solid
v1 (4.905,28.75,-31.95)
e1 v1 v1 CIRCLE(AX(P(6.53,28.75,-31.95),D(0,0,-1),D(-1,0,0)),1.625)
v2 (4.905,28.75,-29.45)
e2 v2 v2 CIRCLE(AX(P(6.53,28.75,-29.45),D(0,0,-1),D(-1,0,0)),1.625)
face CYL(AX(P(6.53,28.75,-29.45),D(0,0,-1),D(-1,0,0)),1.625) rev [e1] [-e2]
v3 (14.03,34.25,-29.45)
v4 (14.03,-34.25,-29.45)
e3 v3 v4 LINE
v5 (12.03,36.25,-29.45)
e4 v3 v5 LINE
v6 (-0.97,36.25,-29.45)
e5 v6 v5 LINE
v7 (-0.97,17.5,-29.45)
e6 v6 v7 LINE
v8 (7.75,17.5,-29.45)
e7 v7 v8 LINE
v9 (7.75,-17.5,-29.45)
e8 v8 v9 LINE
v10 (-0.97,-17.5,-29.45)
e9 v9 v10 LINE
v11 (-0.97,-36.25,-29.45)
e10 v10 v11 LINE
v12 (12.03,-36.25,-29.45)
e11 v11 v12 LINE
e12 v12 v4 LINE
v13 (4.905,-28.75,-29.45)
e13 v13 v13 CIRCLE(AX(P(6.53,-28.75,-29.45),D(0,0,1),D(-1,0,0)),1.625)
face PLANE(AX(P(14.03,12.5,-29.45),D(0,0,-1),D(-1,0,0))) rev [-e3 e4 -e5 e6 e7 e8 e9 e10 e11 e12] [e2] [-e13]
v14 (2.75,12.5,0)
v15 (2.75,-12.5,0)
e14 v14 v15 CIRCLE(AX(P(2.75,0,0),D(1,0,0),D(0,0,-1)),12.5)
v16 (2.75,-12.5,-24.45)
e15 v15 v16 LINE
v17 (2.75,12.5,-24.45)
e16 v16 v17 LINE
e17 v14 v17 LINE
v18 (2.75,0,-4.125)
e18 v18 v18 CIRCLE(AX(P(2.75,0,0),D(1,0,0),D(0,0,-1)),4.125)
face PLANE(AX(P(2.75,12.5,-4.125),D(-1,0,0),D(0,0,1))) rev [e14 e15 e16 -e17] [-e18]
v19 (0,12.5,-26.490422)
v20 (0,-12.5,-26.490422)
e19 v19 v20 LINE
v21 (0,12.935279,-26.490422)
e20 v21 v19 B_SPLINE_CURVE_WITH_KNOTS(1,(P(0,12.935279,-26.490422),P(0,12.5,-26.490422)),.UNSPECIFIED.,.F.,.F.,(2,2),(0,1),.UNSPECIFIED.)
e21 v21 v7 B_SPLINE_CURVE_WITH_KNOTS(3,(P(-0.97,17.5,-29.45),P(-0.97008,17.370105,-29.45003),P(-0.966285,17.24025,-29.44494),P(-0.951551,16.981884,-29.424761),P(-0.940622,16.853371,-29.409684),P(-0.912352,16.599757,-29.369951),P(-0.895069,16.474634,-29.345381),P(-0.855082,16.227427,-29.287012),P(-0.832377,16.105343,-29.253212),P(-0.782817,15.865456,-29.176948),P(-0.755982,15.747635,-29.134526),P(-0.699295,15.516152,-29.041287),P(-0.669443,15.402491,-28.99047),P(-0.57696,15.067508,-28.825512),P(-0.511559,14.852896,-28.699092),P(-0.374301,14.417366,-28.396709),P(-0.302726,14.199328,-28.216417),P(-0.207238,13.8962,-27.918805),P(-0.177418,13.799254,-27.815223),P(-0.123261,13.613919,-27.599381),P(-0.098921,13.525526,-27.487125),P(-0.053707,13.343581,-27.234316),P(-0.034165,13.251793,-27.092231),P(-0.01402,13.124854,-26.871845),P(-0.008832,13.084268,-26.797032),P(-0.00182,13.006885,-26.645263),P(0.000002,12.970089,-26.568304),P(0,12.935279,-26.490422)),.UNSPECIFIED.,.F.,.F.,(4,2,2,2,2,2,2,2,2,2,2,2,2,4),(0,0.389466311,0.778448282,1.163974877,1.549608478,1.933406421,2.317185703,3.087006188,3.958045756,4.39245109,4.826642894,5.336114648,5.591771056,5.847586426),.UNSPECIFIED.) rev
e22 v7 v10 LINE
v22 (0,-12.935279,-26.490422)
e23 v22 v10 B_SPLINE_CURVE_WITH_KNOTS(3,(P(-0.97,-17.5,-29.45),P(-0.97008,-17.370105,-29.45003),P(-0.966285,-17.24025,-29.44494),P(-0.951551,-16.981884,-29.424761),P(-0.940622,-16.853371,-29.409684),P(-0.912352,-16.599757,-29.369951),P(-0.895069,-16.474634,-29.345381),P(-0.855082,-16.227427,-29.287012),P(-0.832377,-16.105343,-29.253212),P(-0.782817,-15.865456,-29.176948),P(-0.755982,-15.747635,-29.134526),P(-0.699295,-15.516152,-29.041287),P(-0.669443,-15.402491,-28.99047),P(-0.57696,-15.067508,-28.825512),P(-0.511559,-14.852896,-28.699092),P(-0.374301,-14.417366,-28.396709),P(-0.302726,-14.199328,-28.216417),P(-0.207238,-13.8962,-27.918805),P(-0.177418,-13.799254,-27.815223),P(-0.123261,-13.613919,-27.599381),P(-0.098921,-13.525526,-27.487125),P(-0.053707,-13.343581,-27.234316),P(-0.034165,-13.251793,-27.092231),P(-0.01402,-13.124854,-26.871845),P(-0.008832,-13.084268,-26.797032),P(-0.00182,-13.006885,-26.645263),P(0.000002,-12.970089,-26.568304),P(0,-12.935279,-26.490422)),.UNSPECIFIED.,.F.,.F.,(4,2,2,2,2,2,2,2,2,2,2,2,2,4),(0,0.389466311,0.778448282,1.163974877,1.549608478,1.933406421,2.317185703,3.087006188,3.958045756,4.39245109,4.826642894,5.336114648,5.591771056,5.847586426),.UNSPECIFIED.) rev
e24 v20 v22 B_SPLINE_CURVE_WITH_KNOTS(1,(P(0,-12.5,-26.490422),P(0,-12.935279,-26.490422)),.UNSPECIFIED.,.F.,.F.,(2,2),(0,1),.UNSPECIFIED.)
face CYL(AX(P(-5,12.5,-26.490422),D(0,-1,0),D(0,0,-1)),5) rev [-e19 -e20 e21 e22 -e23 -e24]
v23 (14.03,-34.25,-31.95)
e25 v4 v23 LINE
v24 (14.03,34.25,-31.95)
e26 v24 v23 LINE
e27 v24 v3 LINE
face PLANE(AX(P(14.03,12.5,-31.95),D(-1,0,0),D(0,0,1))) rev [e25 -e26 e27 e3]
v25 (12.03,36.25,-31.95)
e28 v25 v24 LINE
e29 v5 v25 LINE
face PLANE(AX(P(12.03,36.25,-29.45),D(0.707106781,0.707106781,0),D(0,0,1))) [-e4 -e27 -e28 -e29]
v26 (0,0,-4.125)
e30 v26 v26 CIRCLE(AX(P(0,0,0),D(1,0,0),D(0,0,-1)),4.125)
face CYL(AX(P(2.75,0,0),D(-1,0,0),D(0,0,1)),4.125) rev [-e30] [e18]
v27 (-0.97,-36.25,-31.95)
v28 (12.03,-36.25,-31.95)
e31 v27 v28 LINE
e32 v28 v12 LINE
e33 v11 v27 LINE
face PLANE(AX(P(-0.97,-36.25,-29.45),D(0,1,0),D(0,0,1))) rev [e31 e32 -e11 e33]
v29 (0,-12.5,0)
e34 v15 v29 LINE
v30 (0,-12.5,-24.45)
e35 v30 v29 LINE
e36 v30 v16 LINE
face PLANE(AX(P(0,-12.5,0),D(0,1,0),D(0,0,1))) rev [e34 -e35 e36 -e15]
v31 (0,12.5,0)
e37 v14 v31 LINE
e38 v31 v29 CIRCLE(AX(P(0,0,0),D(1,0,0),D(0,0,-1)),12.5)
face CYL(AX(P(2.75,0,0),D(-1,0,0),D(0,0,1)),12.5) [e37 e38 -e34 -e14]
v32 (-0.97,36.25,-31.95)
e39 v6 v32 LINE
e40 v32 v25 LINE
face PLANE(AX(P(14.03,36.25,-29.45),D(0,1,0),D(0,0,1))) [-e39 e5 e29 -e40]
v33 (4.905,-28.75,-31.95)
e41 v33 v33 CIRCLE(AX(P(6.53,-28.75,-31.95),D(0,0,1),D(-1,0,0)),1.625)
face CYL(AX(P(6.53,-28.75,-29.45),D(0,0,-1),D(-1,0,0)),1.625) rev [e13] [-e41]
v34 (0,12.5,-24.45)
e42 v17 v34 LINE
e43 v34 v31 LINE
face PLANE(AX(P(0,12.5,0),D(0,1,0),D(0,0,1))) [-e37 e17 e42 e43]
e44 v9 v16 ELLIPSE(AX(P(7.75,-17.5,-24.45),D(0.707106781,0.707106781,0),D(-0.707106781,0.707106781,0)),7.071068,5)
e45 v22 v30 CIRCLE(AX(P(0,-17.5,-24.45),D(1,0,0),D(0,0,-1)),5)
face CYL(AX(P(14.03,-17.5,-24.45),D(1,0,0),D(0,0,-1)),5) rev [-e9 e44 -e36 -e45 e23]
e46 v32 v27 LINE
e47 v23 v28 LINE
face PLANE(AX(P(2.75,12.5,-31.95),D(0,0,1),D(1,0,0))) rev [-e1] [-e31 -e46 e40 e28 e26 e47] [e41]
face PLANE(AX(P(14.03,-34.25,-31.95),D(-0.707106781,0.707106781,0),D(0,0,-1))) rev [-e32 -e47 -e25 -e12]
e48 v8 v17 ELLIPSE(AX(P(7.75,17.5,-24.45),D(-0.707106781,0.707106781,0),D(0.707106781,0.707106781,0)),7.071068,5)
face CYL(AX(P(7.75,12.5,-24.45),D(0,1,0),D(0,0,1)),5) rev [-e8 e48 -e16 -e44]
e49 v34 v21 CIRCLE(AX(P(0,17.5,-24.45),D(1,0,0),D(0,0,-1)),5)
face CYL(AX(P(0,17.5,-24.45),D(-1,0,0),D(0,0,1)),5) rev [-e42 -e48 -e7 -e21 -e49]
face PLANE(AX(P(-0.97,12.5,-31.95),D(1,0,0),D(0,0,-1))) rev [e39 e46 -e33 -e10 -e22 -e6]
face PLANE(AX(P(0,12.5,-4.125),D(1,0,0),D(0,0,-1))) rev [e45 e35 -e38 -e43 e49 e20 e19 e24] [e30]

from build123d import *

# Parameters (mm, degrees)
SKETCH1_R               = 4.125
BOSS_EXTRUDE1_DEPTH     = 2.75
BOSS_EXTRUDE4_DEPTH     = 2.5
CUT_EXTRUDE2_REACH      = 80.314
SKETCH7_W               = 7
SKETCH7_H               = 16.5
SKETCH7_W_2             = 16
SKETCH7_H_2             = 8
CUT_EXTRUDE3_REACH      = 82.041
SKETCH9_W               = 2.75
SKETCH9_H               = 22.388822383
SKETCH8_W               = 2.75
SKETCH8_H               = 27.825
BOSS_EXTRUDE5_DEPTH     = 12.5
FILLET2_R               = 1
FILLET3_R               = 4
CUT_EXTRUDE4_DEPTH      = 74.103052287
CUT_EXTRUDE4_DEPTH_BACK = 74.103052287
SKETCH10_W              = 78.235731334
SKETCH10_H              = 6.290045588
SKETCH11_W              = 15
SKETCH11_H              = 2.5
BOSS_EXTRUDE6_DEPTH     = 12.5
BOSS_EXTRUDE7_DEPTH     = 2.5
SKETCH14_R              = 1.625
CUT_EXTRUDE5_DEPTH      = 2.5
FILLET4_R               = 5
CHAMFER1_SIZE           = 2


with BuildPart() as part:
    # Sketch1 → Boss-Extrude1 (new body)
    with BuildSketch(Plane(origin=(0, 0, 0), x_dir=(0, 0, -1), z_dir=(1, 0, 0))):
        with BuildLine():
            Line((0, 12.5), (34.45, 12.5))
            Line((34.45, 12.5), (34.45, -12.5))
            Line((34.45, -12.5), (0, -12.5))
            ThreePointArc((0, -12.5), (-12.5, 0), (0, 12.5))
        make_face()
        Circle(SKETCH1_R, mode=Mode.SUBTRACT)
    extrude(amount=BOSS_EXTRUDE1_DEPTH)

    # Sketch6 → Boss-Extrude4 (add)
    with BuildSketch(Plane(origin=(0, 0, -34.45), x_dir=(-1, 0, 0), z_dir=(0, 0, -1))):
        Polygon((-8.812505246, 36.25), (53.321583376, 36.25), (53.321583376, -36.25), (6.25, -36.25), (-19.178416624, -36.25), (-19.178416624, 36.25), align=None)
    extrude(amount=-BOSS_EXTRUDE4_DEPTH)

    # Sketch7 → Cut-Extrude2 (cut, up to next)
    with BuildSketch(Plane.XY.offset(-31.95), mode=Mode.PRIVATE) as cut_extrude2_sk1:
        with Locations((-1.711858899, -11.632438111)):
            Rectangle(SKETCH7_W, SKETCH7_H)
    cut_extrude2_tool1 = extrude(cut_extrude2_sk1.sketch, amount=-CUT_EXTRUDE2_REACH, mode=Mode.PRIVATE) & part.part
    # Sketch7 → Cut-Extrude2 (cut, up to next)
    with BuildSketch(Plane.XY.offset(-31.95), mode=Mode.PRIVATE) as cut_extrude2_sk2:
        with Locations((-16.5, 0)):
            Rectangle(SKETCH7_W_2, SKETCH7_H_2)
    cut_extrude2_tool2 = extrude(cut_extrude2_sk2.sketch, amount=-CUT_EXTRUDE2_REACH, mode=Mode.PRIVATE) & part.part
    add(cut_extrude2_tool1.solids().sort_by_distance((-1.711859, -11.632438, -31.95))[0], mode=Mode.SUBTRACT)
    add(cut_extrude2_tool2.solids().sort_by_distance((-16.5, 0, -31.95))[0], mode=Mode.SUBTRACT)

    # Sketch9 → Cut-Extrude3 (cut, up to next)
    with BuildSketch(Plane.XZ.offset(12.5), mode=Mode.PRIVATE) as cut_extrude3_sk1:
        with Locations((1.375, -20.755588809)):
            Rectangle(SKETCH9_W, SKETCH9_H)
    cut_extrude3_tool1 = extrude(cut_extrude3_sk1.sketch, amount=-CUT_EXTRUDE3_REACH, mode=Mode.PRIVATE) & part.part
    add(cut_extrude3_tool1.solids().sort_by_distance((1.375, -12.5, -20.755589))[0], mode=Mode.SUBTRACT)


with BuildPart() as cut_extrude3_piece_1:
    # of the separate pieces the step leaves, piece 1, a body of its own (cut_extrude3_pieces)
    add(part.part.solids().sort_by_distance((-53.321583376, 36.25, -31.95))[0])



with BuildPart() as cut_extrude3_piece_2:
    # of the separate pieces the step leaves, piece 2, a body of its own (cut_extrude3_pieces)
    add(part.part.solids().sort_by_distance((0, 12.5, 0))[0])


with BuildPart() as cut_extrude3_piece_1_1:
    add(cut_extrude3_piece_1.part)

    add(cut_extrude3_piece_2.part)  # Boss-Extrude5 merges Cut-Extrude3 piece 2
    # Sketch8 → Boss-Extrude5 (add, symmetric)
    with BuildSketch(Plane(origin=(0, 0, 0), x_dir=(1, 0, 0), z_dir=(0, 1, 0))):
        with Locations((1.375, 18.0375)):
            Rectangle(SKETCH8_W, SKETCH8_H)
    extrude(amount=BOSS_EXTRUDE5_DEPTH, both=True)

    # Fillet2
    fillet2_edges = [cut_extrude3_piece_1_1.edges().sort_by_distance(p)[0] for p in [
        (-8.5, 4, -33.2),
        (-8.5, -4, -33.2),
        (-24.5, -4, -33.2),
        (-24.5, 4, -33.2),
        (-5.211858899, -19.882438111, -33.2),
        (-5.211858899, -3.382438111, -33.2),
        (1.788141101, -3.382438111, -33.2),
        (1.788141101, -19.882438111, -33.2),
    ]]
    fillet(fillet2_edges, radius=FILLET2_R)

    # Fillet3
    fillet3_edges = [cut_extrude3_piece_1_1.edges().sort_by_distance(p)[0] for p in [
        (19.178416624, 36.25, -33.2),
        (-53.321583376, 36.25, -33.2),
        (-53.321583376, -36.25, -33.2),
        (19.178416624, -36.25, -33.2),
    ]]
    fillet(fillet3_edges, radius=FILLET3_R)

    # Sketch10 → Cut-Extrude4 (cut, two sides: drawn at the far end of the back side and taken through both)
    with BuildSketch(Plane(origin=(0, 0, 0), x_dir=(1, 0, 0), z_dir=(0, 1, 0)).offset(-CUT_EXTRUDE4_DEPTH_BACK)):
        with Locations((-17.391929865, 35.095022794)):
            Rectangle(SKETCH10_W, SKETCH10_H)
    extrude(amount=CUT_EXTRUDE4_DEPTH + CUT_EXTRUDE4_DEPTH_BACK, mode=Mode.SUBTRACT)

    # Sketch11 → Boss-Extrude6 (add, symmetric)
    with BuildSketch(Plane(origin=(0, 0, 0), x_dir=(1, 0, 0), z_dir=(0, 1, 0))):
        with Locations((6.53, 30.7)):
            Rectangle(SKETCH11_W, SKETCH11_H)
    boss_extrude6 = extrude(amount=BOSS_EXTRUDE6_DEPTH, both=True)

    # Sketch13 → Boss-Extrude7 (add)
    with BuildSketch(Plane(origin=(0, 0, -31.95), x_dir=(-1, 0, 0), z_dir=(0, 0, -1))):
        Polygon((-14.03, 12.5), (0.97, 12.5), (0.97, 36.25), (-10.03, 36.25), (-14.03, 36.25), (-14.03, 32.25), align=None)
    boss_extrude7 = extrude(amount=-BOSS_EXTRUDE7_DEPTH)

    # Mirror1: Boss-Extrude6, Boss-Extrude7 across plane
    add(boss_extrude6.mirror(Plane.ZX))
    add(boss_extrude7.mirror(Plane.ZX))

    # Sketch14 → Cut-Extrude5 (cut)
    with BuildSketch(Plane(origin=(0, 0, -31.95), x_dir=(-1, 0, 0), z_dir=(0, 0, -1))):
        with Locations((-6.53, 28.75)):
            Circle(SKETCH14_R)
    cut_extrude5 = extrude(amount=-CUT_EXTRUDE5_DEPTH, mode=Mode.SUBTRACT)

    # Mirror2: Cut-Extrude5 across plane
    add(cut_extrude5.mirror(Plane.ZX), mode=Mode.SUBTRACT)

    # Fillet4
    # the kernel refuses this fillet: 5 mm, written as the material it adds along each edge
    with BuildSketch(Plane(origin=(2.75, -12.5, -29.45), x_dir=(1, 0, 0), z_dir=(0, 1, 0))) as fillet4_piece_1:
        with BuildLine():
            CenterArc((FILLET4_R, -FILLET4_R), FILLET4_R, 90, 90)
            Line((0, -FILLET4_R), (-FILLET4_R * 0.02, -FILLET4_R))
            Line((-FILLET4_R * 0.02, -FILLET4_R), (-FILLET4_R * 0.02, FILLET4_R * 0.02))
            Line((-FILLET4_R * 0.02, FILLET4_R * 0.02), (FILLET4_R, FILLET4_R * 0.02))
            Line((FILLET4_R, FILLET4_R * 0.02), (FILLET4_R, 0))
        make_face()
    extrude(amount=25)
    with BuildSketch(Plane(origin=(0, -12.5, -29.45), x_dir=(-1, 0, 0), z_dir=(0, 1, 0))) as fillet4_piece_2:
        with BuildLine():
            CenterArc((5, 2.959577673), FILLET4_R, 180, 36.293058493)
            Line((0, 2.959577673), (-0.1, 2.959577673))
            Line((-0.1, 2.959577673), (-0.1, 0))
            Line((-0.1, 0), (0, -0.1))
            ThreePointArc((0, -0.1), (0.485, -0.1), (0.8894, -0.059191553))
            Line((0.8894, -0.059191553), (0.97, 0))
        make_face()
    extrude(amount=25)
    with BuildSketch(Plane(origin=(2.75, 12.5, -29.45), x_dir=(0, 0, 1), z_dir=(-1, 0, 0)), Plane(origin=(2.75, -12.5, -29.45), x_dir=(0, -1, 0), z_dir=(-1, 0, 0))) as fillet4_piece_3:
        with BuildLine():
            CenterArc((FILLET4_R, FILLET4_R), FILLET4_R, 180, 90)
            Line((0, FILLET4_R), (-FILLET4_R * 0.02, FILLET4_R))
            Line((-FILLET4_R * 0.02, FILLET4_R), (-FILLET4_R * 0.02, -FILLET4_R * 0.02))
            Line((-FILLET4_R * 0.02, -FILLET4_R * 0.02), (FILLET4_R, -FILLET4_R * 0.02))
            Line((FILLET4_R, -FILLET4_R * 0.02), (FILLET4_R, 0))
        make_face()
    extrude(amount=2.75)
    with BuildSketch(Plane(origin=(2.75, -25, -29.45), x_dir=(1, 0, 0), z_dir=(0, 1, 0))) as fillet4_piece_4a_section:
        with BuildLine():
            CenterArc((FILLET4_R, -FILLET4_R), FILLET4_R, 90, 90)
            Line((0, -FILLET4_R), (-FILLET4_R * 0.02, -FILLET4_R))
            Line((-FILLET4_R * 0.02, -FILLET4_R), (-FILLET4_R * 0.02, FILLET4_R * 0.02))
            Line((-FILLET4_R * 0.02, FILLET4_R * 0.02), (FILLET4_R, FILLET4_R * 0.02))
            Line((FILLET4_R, FILLET4_R * 0.02), (FILLET4_R, 0))
        make_face()
    fillet4_piece_4a = extrude(amount=37.5, mode=Mode.PRIVATE)
    fillet4_piece_4a = split(fillet4_piece_4a, bisect_by=Plane(origin=(3.881975571, -12.5, -28.318024429), z_dir=(0, -1, 0)), keep=Keep.TOP, mode=Mode.PRIVATE)
    with BuildSketch(Plane(origin=(15.25, -12.5, -29.45), x_dir=(0, -1, 0), z_dir=(-1, 0, 0))) as fillet4_piece_4b_section:
        with BuildLine():
            CenterArc((FILLET4_R, FILLET4_R), FILLET4_R, 180, 90)
            Line((0, FILLET4_R), (-FILLET4_R * 0.02, FILLET4_R))
            Line((-FILLET4_R * 0.02, FILLET4_R), (-FILLET4_R * 0.02, -FILLET4_R * 0.02))
            Line((-FILLET4_R * 0.02, -FILLET4_R * 0.02), (FILLET4_R, -FILLET4_R * 0.02))
            Line((FILLET4_R, -FILLET4_R * 0.02), (FILLET4_R, 0))
        make_face()
    fillet4_piece_4b = extrude(amount=15.25, mode=Mode.PRIVATE)
    fillet4_piece_4b = split(fillet4_piece_4b, bisect_by=Plane(origin=(14.03, -13.631975571, -28.318024429), z_dir=(-1, 0, 0)), keep=Keep.TOP, mode=Mode.PRIVATE)
    fillet4_piece_4b = split(fillet4_piece_4b, bisect_by=Plane(origin=(2.75, -13.631975571, -28.318024429), z_dir=(1, 0, 0)), keep=Keep.TOP, mode=Mode.PRIVATE)
    fillet4_piece_4 = fillet4_piece_4a & fillet4_piece_4b
    add(fillet4_piece_4)
    with BuildSketch(Plane(origin=(15.25, 12.5, -29.45), x_dir=(0, 0, 1), z_dir=(-1, 0, 0))) as fillet4_piece_5a_section:
        with BuildLine():
            CenterArc((FILLET4_R, FILLET4_R), FILLET4_R, 180, 90)
            Line((0, FILLET4_R), (-FILLET4_R * 0.02, FILLET4_R))
            Line((-FILLET4_R * 0.02, FILLET4_R), (-FILLET4_R * 0.02, -FILLET4_R * 0.02))
            Line((-FILLET4_R * 0.02, -FILLET4_R * 0.02), (FILLET4_R, -FILLET4_R * 0.02))
            Line((FILLET4_R, -FILLET4_R * 0.02), (FILLET4_R, 0))
        make_face()
    fillet4_piece_5a = extrude(amount=15.25, mode=Mode.PRIVATE)
    fillet4_piece_5a = split(fillet4_piece_5a, bisect_by=Plane(origin=(2.75, 13.631975571, -28.318024429), z_dir=(1, 0, 0)), keep=Keep.TOP, mode=Mode.PRIVATE)
    fillet4_piece_5a = split(fillet4_piece_5a, bisect_by=Plane(origin=(14.03, 13.631975571, -28.318024429), z_dir=(-1, 0, 0)), keep=Keep.TOP, mode=Mode.PRIVATE)
    with BuildSketch(Plane(origin=(2.75, -12.5, -29.45), x_dir=(1, 0, 0), z_dir=(0, 1, 0))) as fillet4_piece_5b_section:
        with BuildLine():
            CenterArc((FILLET4_R, -FILLET4_R), FILLET4_R, 90, 90)
            Line((0, -FILLET4_R), (-FILLET4_R * 0.02, -FILLET4_R))
            Line((-FILLET4_R * 0.02, -FILLET4_R), (-FILLET4_R * 0.02, FILLET4_R * 0.02))
            Line((-FILLET4_R * 0.02, FILLET4_R * 0.02), (FILLET4_R, FILLET4_R * 0.02))
            Line((FILLET4_R, FILLET4_R * 0.02), (FILLET4_R, 0))
        make_face()
    fillet4_piece_5b = extrude(amount=37.5, mode=Mode.PRIVATE)
    fillet4_piece_5b = split(fillet4_piece_5b, bisect_by=Plane(origin=(3.881975571, 12.5, -28.318024429), z_dir=(0, 1, 0)), keep=Keep.TOP, mode=Mode.PRIVATE)
    fillet4_piece_5 = fillet4_piece_5a & fillet4_piece_5b
    add(fillet4_piece_5)
    with BuildSketch(Plane(origin=(2.75, -12.5, -29.45), x_dir=(0, -1, 0), z_dir=(-1, 0, 0))) as fillet4_piece_6a_section:
        with BuildLine():
            CenterArc((FILLET4_R, FILLET4_R), FILLET4_R, 180, 90)
            Line((0, FILLET4_R), (-FILLET4_R * 0.02, FILLET4_R))
            Line((-FILLET4_R * 0.02, FILLET4_R), (-FILLET4_R * 0.02, -FILLET4_R * 0.02))
            Line((-FILLET4_R * 0.02, -FILLET4_R * 0.02), (FILLET4_R, -FILLET4_R * 0.02))
            Line((FILLET4_R, -FILLET4_R * 0.02), (FILLET4_R, 0))
        make_face()
    fillet4_piece_6a = extrude(amount=15.25, mode=Mode.PRIVATE)
    fillet4_piece_6a = split(fillet4_piece_6a, bisect_by=Plane(origin=(-0.97, -13.631975571, -28.318024429), z_dir=(1, 0, 0)), keep=Keep.TOP, mode=Mode.PRIVATE)
    fillet4_piece_6a = split(fillet4_piece_6a, bisect_by=Plane(origin=(0, -13.631975571, -28.318024429), z_dir=(-1, 0, 0)), keep=Keep.TOP, mode=Mode.PRIVATE)
    with BuildSketch(Plane(origin=(0, -19.898944181, -29.45), x_dir=(-1, 0, 0), z_dir=(0, 1, 0))) as fillet4_piece_6b_section:
        with BuildLine():
            CenterArc((5, 2.959577673), FILLET4_R, 180, 36.293058493)
            Line((0, 2.959577673), (-0.1, 2.959577673))
            Line((-0.1, 2.959577673), (-0.1, 0))
            Line((-0.1, 0), (0, -0.1))
            ThreePointArc((0, -0.1), (0.485, -0.1), (0.8894, -0.059191553))
            Line((0.8894, -0.059191553), (0.97, 0))
        make_face()
    fillet4_piece_6b = extrude(amount=32.398944181, mode=Mode.PRIVATE)
    fillet4_piece_6b = split(fillet4_piece_6b, bisect_by=Plane(origin=(-0.217435867, -12.5, -28.607978011), z_dir=(0, -1, 0)), keep=Keep.TOP, mode=Mode.PRIVATE)
    fillet4_piece_6 = fillet4_piece_6a & fillet4_piece_6b
    add(fillet4_piece_6)
    with BuildSketch(Plane(origin=(2.75, 12.5, -29.45), x_dir=(0, 0, 1), z_dir=(-1, 0, 0))) as fillet4_piece_7a_section:
        with BuildLine():
            CenterArc((FILLET4_R, FILLET4_R), FILLET4_R, 180, 90)
            Line((0, FILLET4_R), (-FILLET4_R * 0.02, FILLET4_R))
            Line((-FILLET4_R * 0.02, FILLET4_R), (-FILLET4_R * 0.02, -FILLET4_R * 0.02))
            Line((-FILLET4_R * 0.02, -FILLET4_R * 0.02), (FILLET4_R, -FILLET4_R * 0.02))
            Line((FILLET4_R, -FILLET4_R * 0.02), (FILLET4_R, 0))
        make_face()
    fillet4_piece_7a = extrude(amount=15.25, mode=Mode.PRIVATE)
    fillet4_piece_7a = split(fillet4_piece_7a, bisect_by=Plane(origin=(0, 13.631975571, -28.318024429), z_dir=(-1, 0, 0)), keep=Keep.TOP, mode=Mode.PRIVATE)
    fillet4_piece_7a = split(fillet4_piece_7a, bisect_by=Plane(origin=(-0.97, 13.631975571, -28.318024429), z_dir=(1, 0, 0)), keep=Keep.TOP, mode=Mode.PRIVATE)
    with BuildSketch(Plane(origin=(0, -12.5, -29.45), x_dir=(-1, 0, 0), z_dir=(0, 1, 0))) as fillet4_piece_7b_section:
        with BuildLine():
            CenterArc((5, 2.959577673), FILLET4_R, 180, 36.293058493)
            Line((0, 2.959577673), (-0.1, 2.959577673))
            Line((-0.1, 2.959577673), (-0.1, 0))
            Line((-0.1, 0), (0, -0.1))
            ThreePointArc((0, -0.1), (0.485, -0.1), (0.8894, -0.059191553))
            Line((0.8894, -0.059191553), (0.97, 0))
        make_face()
    fillet4_piece_7b = extrude(amount=32.398944181, mode=Mode.PRIVATE)
    fillet4_piece_7b = split(fillet4_piece_7b, bisect_by=Plane(origin=(-0.217435867, 12.5, -28.607978011), z_dir=(0, 1, 0)), keep=Keep.TOP, mode=Mode.PRIVATE)
    fillet4_piece_7 = fillet4_piece_7a & fillet4_piece_7b
    add(fillet4_piece_7)

    # Chamfer1
    chamfer1_edges = [cut_extrude3_piece_1_1.edges().sort_by_distance(p)[0] for p in [
        (14.03, 36.25, -30.7),
        (14.03, -36.25, -30.7),
    ]]
    chamfer(chamfer1_edges, length=CHAMFER1_SIZE)


solid = cut_extrude3_piece_1_1.part
